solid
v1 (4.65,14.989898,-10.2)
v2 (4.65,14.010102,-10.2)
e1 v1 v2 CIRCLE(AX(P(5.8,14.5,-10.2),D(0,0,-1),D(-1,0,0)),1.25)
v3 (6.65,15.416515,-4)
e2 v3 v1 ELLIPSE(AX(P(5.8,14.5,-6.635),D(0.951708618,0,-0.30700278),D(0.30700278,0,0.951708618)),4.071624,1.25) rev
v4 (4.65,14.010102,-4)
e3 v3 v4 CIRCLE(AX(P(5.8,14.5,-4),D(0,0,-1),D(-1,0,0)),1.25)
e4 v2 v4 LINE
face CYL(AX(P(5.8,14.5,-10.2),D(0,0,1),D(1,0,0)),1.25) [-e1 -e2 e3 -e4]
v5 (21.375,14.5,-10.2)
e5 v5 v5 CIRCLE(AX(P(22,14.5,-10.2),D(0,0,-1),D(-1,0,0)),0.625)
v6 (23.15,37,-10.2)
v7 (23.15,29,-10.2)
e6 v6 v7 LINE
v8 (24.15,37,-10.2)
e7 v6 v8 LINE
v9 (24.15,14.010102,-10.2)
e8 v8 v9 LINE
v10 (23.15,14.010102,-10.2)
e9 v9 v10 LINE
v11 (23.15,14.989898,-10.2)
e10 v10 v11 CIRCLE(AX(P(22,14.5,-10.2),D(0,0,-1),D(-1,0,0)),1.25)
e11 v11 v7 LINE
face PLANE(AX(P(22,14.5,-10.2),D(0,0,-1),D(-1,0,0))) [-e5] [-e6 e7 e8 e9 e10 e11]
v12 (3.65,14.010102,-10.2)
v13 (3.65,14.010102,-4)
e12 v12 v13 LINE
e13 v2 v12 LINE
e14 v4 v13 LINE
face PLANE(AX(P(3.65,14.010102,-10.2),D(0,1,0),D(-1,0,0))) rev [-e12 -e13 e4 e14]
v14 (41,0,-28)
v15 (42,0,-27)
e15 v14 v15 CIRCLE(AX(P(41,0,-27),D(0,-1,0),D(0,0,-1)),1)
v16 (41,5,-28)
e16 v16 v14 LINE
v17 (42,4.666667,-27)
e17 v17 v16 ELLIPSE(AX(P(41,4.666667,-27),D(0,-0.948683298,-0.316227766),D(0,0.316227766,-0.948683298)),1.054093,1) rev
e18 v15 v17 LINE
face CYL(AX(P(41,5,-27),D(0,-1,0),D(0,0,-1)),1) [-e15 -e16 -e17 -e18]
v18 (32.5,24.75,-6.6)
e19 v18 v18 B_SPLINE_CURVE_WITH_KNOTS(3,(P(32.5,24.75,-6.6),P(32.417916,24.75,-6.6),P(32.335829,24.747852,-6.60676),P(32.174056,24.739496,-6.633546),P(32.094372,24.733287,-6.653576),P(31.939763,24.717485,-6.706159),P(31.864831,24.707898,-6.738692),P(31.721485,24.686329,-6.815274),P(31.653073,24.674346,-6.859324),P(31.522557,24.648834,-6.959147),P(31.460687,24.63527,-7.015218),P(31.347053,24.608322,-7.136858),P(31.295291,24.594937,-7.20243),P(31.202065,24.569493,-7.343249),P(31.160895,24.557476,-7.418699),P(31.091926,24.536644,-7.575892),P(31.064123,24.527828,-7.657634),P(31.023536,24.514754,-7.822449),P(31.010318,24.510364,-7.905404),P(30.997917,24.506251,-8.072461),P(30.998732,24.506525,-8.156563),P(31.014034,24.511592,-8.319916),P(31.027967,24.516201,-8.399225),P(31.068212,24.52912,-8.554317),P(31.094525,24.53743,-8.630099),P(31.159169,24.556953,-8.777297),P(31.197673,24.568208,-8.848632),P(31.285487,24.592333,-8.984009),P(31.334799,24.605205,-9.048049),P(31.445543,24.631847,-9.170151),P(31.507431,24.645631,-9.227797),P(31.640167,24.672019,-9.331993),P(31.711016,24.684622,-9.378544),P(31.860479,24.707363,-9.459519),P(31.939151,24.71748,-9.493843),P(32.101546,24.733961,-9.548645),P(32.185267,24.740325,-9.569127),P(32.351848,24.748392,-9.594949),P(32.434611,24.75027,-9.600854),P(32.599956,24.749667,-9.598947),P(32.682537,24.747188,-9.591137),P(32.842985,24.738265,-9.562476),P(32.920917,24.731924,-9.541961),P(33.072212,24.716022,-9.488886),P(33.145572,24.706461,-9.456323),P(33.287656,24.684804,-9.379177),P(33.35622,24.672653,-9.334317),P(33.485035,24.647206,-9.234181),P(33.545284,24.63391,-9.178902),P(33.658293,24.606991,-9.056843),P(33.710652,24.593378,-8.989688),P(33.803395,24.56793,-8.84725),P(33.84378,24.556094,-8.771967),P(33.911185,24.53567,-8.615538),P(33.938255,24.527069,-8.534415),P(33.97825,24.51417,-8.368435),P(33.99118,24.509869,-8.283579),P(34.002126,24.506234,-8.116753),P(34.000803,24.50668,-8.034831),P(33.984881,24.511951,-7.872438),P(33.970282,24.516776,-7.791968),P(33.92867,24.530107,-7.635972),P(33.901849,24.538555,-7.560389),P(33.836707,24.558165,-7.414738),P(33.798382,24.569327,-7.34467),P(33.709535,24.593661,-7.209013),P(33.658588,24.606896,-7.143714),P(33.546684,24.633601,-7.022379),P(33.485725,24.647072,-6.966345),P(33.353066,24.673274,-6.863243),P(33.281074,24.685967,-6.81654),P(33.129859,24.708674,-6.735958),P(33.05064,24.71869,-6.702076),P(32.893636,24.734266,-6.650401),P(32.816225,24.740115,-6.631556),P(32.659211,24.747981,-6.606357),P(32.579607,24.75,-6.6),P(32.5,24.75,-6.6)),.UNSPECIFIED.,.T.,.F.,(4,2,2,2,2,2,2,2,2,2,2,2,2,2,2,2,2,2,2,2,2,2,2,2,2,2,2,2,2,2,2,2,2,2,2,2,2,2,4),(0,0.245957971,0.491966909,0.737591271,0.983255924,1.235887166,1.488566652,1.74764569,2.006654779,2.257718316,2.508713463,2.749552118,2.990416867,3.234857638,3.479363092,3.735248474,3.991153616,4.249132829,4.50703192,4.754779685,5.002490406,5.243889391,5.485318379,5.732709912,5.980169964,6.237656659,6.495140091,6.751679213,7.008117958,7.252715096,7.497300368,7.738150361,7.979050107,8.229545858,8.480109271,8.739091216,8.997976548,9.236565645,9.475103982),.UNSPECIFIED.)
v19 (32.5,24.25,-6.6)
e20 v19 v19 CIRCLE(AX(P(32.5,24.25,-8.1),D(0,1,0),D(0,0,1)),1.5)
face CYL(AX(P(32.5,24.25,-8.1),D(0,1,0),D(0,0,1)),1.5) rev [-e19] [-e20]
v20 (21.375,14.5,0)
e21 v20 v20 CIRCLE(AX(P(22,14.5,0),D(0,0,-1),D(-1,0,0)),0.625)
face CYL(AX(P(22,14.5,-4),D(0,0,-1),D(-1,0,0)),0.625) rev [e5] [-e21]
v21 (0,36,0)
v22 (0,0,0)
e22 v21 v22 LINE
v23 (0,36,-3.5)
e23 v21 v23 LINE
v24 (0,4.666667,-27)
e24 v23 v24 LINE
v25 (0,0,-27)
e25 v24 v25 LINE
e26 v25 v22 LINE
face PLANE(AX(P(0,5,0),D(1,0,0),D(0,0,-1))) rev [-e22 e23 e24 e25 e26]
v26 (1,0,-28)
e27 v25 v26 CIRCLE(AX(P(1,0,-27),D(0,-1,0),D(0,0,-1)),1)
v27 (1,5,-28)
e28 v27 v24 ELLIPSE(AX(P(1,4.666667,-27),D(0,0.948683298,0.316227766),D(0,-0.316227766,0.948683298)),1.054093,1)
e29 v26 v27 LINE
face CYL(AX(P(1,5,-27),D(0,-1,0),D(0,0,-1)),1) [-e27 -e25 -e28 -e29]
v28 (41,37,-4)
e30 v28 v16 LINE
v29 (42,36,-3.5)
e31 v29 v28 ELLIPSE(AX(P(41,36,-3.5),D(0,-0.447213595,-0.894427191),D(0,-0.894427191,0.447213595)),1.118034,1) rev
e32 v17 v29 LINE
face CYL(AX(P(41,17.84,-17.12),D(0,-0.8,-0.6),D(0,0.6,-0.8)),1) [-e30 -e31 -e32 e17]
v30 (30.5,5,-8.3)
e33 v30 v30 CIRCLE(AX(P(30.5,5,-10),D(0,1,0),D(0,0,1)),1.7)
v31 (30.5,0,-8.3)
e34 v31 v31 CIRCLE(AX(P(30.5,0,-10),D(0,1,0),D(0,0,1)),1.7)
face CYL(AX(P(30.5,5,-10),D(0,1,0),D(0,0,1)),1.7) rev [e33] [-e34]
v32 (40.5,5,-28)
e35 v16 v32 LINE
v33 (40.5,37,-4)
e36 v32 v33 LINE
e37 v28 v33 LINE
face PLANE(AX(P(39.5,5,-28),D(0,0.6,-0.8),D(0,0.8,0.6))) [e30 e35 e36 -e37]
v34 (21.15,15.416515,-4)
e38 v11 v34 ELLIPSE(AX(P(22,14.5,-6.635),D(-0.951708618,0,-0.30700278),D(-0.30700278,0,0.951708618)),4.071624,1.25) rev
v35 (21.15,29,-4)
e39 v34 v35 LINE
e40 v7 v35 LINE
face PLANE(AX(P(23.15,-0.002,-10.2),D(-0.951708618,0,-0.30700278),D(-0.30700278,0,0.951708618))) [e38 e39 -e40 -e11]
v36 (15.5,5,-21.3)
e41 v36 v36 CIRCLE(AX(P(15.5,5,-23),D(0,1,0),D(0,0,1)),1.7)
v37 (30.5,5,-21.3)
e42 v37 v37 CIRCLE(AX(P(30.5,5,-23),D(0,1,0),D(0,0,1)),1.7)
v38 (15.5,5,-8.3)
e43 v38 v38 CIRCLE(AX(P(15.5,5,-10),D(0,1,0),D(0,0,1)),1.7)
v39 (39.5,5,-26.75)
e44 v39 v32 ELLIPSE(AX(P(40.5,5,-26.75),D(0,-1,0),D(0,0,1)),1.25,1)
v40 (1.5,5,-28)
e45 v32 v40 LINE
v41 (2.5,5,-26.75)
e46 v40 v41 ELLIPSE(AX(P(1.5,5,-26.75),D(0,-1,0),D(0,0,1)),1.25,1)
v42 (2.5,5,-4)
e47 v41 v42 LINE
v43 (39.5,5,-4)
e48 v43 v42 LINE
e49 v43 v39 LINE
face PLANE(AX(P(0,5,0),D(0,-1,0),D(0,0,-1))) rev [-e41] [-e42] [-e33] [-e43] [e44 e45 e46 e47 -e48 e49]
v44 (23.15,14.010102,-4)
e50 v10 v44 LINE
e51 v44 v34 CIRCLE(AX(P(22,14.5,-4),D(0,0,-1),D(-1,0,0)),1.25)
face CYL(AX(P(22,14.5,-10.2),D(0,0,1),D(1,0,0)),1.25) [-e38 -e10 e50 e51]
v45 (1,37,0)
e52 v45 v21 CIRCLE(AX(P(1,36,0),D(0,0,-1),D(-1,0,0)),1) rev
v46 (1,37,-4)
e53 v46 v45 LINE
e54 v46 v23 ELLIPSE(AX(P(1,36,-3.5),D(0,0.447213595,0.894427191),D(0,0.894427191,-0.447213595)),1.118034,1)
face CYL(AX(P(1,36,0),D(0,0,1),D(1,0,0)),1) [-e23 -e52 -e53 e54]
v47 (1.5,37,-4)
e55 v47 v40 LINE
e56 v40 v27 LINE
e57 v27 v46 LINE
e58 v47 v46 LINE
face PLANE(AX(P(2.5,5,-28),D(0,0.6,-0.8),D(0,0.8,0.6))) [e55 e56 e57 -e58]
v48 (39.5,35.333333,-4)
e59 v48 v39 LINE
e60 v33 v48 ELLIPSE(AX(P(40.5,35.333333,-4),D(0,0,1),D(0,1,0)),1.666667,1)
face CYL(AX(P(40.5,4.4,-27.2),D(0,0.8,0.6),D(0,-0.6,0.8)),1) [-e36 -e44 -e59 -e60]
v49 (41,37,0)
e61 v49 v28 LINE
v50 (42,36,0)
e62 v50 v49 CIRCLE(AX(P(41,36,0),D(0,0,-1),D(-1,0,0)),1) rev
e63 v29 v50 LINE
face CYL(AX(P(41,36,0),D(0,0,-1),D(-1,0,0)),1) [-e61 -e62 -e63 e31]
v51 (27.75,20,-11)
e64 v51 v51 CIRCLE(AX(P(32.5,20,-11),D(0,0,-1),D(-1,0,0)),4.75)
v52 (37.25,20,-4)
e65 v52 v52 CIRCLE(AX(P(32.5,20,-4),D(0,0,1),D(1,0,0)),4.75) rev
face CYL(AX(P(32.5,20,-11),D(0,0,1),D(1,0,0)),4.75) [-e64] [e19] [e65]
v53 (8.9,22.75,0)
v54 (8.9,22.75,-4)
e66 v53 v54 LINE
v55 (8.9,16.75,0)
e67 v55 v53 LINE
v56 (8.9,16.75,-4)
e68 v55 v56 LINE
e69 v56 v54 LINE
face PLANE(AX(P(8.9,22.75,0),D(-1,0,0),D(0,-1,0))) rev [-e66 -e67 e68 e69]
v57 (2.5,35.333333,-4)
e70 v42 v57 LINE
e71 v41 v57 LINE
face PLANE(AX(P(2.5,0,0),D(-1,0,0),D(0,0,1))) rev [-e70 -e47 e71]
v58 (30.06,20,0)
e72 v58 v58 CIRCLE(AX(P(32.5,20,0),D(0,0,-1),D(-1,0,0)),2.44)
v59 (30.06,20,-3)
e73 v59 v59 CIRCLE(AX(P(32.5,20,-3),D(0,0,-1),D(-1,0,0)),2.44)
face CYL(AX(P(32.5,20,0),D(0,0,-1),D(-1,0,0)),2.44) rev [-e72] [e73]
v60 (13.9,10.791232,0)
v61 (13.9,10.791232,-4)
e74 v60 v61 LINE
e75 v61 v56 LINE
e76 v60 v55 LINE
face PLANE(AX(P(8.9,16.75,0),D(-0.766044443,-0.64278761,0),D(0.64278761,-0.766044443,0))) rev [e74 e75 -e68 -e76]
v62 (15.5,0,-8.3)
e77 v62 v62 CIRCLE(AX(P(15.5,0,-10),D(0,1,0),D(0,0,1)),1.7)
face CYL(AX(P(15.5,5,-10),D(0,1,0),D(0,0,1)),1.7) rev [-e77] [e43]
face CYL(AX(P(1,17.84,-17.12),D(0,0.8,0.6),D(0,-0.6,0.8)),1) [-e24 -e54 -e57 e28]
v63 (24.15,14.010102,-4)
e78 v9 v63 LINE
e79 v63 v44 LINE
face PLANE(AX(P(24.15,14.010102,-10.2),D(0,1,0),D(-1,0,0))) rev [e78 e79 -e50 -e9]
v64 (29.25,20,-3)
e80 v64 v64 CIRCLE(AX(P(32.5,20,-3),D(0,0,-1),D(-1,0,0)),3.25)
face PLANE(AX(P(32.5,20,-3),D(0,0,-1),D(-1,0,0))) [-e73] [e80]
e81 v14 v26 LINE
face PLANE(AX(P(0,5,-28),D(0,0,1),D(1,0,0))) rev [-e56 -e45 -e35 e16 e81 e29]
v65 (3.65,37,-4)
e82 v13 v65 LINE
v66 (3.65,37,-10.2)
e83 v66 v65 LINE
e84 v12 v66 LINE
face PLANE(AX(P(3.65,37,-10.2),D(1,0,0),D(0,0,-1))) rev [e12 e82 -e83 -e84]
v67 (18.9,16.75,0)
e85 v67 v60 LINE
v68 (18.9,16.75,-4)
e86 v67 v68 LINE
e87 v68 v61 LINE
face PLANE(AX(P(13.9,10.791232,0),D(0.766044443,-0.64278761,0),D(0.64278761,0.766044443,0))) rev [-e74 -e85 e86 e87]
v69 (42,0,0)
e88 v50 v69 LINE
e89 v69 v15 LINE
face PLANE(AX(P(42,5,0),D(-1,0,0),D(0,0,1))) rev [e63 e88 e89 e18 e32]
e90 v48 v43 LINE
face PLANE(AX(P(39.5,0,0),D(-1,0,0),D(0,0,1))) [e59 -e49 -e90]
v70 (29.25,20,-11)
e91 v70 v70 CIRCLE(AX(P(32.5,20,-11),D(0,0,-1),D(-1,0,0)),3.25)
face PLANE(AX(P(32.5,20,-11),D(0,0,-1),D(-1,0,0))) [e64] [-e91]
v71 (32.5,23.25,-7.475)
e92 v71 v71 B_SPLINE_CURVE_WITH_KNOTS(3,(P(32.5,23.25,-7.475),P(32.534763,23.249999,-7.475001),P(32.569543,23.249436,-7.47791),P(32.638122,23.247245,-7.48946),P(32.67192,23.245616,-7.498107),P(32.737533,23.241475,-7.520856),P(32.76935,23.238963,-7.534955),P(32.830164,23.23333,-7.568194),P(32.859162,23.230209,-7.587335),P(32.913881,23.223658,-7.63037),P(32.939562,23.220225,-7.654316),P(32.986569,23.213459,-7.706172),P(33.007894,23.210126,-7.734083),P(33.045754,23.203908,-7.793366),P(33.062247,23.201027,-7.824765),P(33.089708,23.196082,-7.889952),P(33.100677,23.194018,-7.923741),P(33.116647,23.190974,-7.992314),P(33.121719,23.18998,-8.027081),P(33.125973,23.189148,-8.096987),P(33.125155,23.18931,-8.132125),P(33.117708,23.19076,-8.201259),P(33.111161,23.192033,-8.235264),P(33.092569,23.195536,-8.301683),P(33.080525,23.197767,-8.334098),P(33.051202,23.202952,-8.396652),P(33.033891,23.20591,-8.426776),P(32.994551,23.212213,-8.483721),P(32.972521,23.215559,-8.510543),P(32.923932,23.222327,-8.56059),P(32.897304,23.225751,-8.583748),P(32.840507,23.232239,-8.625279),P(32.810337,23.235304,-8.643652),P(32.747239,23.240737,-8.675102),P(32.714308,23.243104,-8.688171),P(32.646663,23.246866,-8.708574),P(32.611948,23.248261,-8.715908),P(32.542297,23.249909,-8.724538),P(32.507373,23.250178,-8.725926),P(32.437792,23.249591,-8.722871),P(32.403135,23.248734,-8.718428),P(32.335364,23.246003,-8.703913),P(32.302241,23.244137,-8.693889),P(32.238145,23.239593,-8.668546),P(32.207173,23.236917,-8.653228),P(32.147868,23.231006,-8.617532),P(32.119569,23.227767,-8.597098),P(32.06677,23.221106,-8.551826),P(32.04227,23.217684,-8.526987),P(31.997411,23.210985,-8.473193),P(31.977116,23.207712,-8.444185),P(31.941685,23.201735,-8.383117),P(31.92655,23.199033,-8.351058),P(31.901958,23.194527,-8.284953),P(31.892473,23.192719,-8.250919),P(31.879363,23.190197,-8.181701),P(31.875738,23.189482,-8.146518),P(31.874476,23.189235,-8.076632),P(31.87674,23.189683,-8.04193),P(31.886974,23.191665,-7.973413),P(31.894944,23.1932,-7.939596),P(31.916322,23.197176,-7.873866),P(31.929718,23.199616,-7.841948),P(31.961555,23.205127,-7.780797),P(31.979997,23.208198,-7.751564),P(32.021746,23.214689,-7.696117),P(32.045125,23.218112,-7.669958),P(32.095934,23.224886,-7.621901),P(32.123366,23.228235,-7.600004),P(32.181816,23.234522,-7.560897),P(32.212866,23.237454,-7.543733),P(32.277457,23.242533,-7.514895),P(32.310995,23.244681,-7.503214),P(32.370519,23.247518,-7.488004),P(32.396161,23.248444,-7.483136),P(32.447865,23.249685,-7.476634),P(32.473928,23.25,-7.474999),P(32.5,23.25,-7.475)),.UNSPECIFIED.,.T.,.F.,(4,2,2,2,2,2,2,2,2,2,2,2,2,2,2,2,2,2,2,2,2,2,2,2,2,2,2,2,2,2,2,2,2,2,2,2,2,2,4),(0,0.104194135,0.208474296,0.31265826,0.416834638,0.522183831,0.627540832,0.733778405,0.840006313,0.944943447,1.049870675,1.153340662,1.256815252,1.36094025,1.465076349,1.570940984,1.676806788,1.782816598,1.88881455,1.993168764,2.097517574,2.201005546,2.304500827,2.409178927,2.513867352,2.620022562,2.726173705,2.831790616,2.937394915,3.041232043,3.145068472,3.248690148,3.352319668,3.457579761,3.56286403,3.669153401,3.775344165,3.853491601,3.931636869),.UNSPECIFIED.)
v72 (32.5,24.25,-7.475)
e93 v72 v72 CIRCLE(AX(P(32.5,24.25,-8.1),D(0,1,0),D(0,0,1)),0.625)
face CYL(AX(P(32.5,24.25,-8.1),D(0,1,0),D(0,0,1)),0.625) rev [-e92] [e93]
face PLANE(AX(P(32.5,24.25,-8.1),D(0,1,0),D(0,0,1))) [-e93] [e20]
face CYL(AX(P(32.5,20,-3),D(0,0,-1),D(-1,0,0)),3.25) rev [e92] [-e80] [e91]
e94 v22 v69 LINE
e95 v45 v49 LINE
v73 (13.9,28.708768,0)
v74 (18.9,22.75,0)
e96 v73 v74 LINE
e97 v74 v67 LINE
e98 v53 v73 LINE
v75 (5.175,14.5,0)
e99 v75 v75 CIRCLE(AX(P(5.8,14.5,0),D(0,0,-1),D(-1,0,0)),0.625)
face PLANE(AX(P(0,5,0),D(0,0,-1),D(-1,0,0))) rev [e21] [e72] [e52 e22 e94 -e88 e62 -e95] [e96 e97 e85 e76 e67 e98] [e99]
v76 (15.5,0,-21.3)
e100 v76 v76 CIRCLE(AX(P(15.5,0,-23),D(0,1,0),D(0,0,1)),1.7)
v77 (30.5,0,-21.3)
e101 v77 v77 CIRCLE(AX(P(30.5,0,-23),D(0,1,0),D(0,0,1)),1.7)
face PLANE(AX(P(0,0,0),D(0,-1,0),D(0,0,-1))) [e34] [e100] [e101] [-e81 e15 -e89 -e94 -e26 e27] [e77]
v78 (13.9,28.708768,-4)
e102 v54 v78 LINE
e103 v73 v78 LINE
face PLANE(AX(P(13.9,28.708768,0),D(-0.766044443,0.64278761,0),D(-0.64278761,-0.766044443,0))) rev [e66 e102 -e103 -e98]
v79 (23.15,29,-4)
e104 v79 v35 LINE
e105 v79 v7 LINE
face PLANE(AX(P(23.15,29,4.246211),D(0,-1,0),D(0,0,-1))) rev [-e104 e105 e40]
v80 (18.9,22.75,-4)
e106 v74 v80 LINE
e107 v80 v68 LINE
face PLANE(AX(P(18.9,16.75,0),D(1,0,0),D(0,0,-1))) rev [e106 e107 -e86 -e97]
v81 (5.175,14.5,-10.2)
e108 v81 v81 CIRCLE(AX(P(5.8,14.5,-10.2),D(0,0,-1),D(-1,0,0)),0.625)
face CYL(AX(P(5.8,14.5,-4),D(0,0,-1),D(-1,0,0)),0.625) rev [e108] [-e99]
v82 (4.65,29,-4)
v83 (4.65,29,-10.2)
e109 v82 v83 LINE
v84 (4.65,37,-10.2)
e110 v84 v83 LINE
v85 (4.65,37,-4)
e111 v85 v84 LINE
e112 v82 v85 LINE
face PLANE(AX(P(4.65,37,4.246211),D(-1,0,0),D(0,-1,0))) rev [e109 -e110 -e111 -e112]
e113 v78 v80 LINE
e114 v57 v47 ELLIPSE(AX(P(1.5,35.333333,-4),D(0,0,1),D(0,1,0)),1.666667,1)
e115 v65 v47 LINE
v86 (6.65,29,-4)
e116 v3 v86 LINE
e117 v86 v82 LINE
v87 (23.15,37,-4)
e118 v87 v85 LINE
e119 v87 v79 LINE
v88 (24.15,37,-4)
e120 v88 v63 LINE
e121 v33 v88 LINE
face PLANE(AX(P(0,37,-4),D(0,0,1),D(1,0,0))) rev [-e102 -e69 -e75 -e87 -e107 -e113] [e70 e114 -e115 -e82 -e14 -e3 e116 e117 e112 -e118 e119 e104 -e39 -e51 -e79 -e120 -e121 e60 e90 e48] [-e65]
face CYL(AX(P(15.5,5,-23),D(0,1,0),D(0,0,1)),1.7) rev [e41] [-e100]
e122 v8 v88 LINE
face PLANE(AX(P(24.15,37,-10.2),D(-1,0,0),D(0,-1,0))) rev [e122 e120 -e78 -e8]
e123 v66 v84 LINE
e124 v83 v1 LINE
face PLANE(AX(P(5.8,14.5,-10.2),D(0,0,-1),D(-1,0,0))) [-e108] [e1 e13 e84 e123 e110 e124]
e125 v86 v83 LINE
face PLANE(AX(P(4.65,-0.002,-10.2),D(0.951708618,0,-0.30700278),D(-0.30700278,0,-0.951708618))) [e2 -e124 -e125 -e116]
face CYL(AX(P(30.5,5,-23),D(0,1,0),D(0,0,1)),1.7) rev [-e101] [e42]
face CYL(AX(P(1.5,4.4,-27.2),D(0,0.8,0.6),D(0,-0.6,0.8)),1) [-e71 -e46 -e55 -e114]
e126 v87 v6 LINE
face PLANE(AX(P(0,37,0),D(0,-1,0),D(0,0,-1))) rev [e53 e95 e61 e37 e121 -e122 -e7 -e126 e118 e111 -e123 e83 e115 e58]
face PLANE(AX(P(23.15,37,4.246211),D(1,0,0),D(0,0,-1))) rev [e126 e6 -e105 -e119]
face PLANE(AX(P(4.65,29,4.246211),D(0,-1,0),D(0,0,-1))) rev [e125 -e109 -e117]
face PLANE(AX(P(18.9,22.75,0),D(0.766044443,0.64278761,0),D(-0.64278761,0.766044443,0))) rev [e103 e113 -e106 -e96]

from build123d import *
from build123d.topology import SkipClean

# Parameters (mm, degrees)
SKETCH1_W                           = 42
SKETCH1_H                           = 28
BOSS_EXTRUDE1_DEPTH                 = 5
SKETCH2_W                           = 42
SKETCH2_H                           = 4
BOSS_EXTRUDE2_DEPTH                 = 32
TAP_DRILL_FOR_M1_6X0_35_TAP1_D      = 1.25
M3_CLEARANCE_HOLE1_D                = 3.4
BOSS_EXTRUDE3_DEPTH                 = 2.5
BOSS_EXTRUDE4_DEPTH                 = 2.5
FILLET2_R                           = 1
SKETCH9_R                           = 3.25
CUT_EXTRUDE1_DEPTH                  = 1
SKETCH10_R                          = 2.44
CUT_EXTRUDE2_DEPTH                  = 62.302528496
SKETCH11_R                          = 0.625
BOSS_EXTRUDE5_DEPTH                 = 6.2
CUT_EXTRUDE3_DEPTH                  = 61.901559914
BOSS_EXTRUDE6_REACH                 = 64.586
BOSS_EXTRUDE8_START                 = 7
SKETCH16_R                          = 4.75
SKETCH16_R_2                        = 3.25
BOSS_EXTRUDE8_DEPTH                 = 7
SKETCH17_R                          = 1.5
CUT_EXTRUDE4_DEPTH                  = 0.5
TAP_DRILL_FOR_M1_6X0_35_TAP2_REACH  = 58.001
TAP_DRILL_FOR_M1_6X0_35_TAP2_BORE_R = 0.625
SKETCH21_W                          = 2
SKETCH21_H                          = 8
CUT_EXTRUDE5_DEPTH                  = 6.2


with BuildPart() as part:
    # Sketch1 → Boss-Extrude1 (new body)
    with BuildSketch(Plane(origin=(0, 0, 0), x_dir=(1, 0, 0), z_dir=(0, 1, 0))):
        with Locations((21, 14)):
            Rectangle(SKETCH1_W, SKETCH1_H)
    extrude(amount=BOSS_EXTRUDE1_DEPTH)

    # Sketch2 → Boss-Extrude2 (add)
    with BuildSketch(Plane(origin=(0, 5, 0), x_dir=(1, 0, 0), z_dir=(0, 1, 0))):
        with Locations((21, 2)):
            Rectangle(SKETCH2_W, SKETCH2_H)
    extrude(amount=BOSS_EXTRUDE2_DEPTH)

    # Tap Drill for M1.6x0.35 Tap1 (through all)
    with Locations(Plane(origin=(0, 0, -4), x_dir=(-1, 0, 0), z_dir=(0, 0, -1))):
        with Locations((-22, 14.5), (-5.8, 14.5)):
            Hole(TAP_DRILL_FOR_M1_6X0_35_TAP1_D / 2)

    # M3 Clearance Hole1 (through all)
    with Locations(Plane(origin=(0, 5, 0), x_dir=(1, 0, 0), z_dir=(0, 1, 0))):
        with Locations((15.5, 23), (30.5, 23), (30.5, 10), (15.5, 10)):
            Hole(M3_CLEARANCE_HOLE1_D / 2)

    # Sketch7 → Boss-Extrude3 (add)
    with BuildSketch(Plane.ZY):
        Polygon((-28, 5), (-4, 37), (-4, 5), align=None)
    extrude(amount=-BOSS_EXTRUDE3_DEPTH)

    # Sketch8 → Boss-Extrude4 (add)
    with BuildSketch(Plane(origin=(42, 0, 0), x_dir=(0, 0, -1), z_dir=(1, 0, 0))):
        Polygon((28, 5), (4, 37), (4, 5), align=None)
    extrude(amount=-BOSS_EXTRUDE4_DEPTH)

    # Fillet2
    fillet2_edges = [part.edges().sort_by_distance(p)[0] for p in [
        (0, 37, -2),
        (42, 37, -2),
        (2.5, 21, -16),
        (0, 21, -16),
        (39.5, 21, -16),
        (42, 21, -16),
        (0, 2.5, -28),
        (42, 2.5, -28),
    ]]
    fillet(fillet2_edges, radius=FILLET2_R)

    # Sketch9 → Cut-Extrude1 (cut)
    with BuildSketch(Plane(origin=(0, 0, -4), x_dir=(-1, 0, 0), z_dir=(0, 0, -1))):
        with Locations((-32.5, 20)):
            Circle(SKETCH9_R)
    extrude(amount=-CUT_EXTRUDE1_DEPTH, mode=Mode.SUBTRACT)

    # Sketch10 → Cut-Extrude2 (cut, through all)
    with BuildSketch(Plane(origin=(0, 0, -3), x_dir=(-1, 0, 0), z_dir=(0, 0, -1))):
        with Locations((-32.5, 20)):
            Circle(SKETCH10_R)
    extrude(amount=-CUT_EXTRUDE2_DEPTH, mode=Mode.SUBTRACT)

    # Sketch11 → Boss-Extrude5 (add)
    # profile 1 of 2: a face of its own
    with SkipClean():  # the faces are left unmerged after this step: merging them gives an invalid solid
        with BuildSketch(Plane(origin=(0, 0, -4), x_dir=(-1, 0, 0), z_dir=(0, 0, -1))):
            with BuildLine():
                Line((-3.65, 37), (-4.65, 37))
                Line((-4.65, 37), (-4.65, 14.989897949))
                ThreePointArc((-4.65, 14.989897949), (-7.05, 14.5), (-4.65, 14.010102051))
                Line((-4.65, 14.010102051), (-3.65, 14.010102051))
                Line((-3.65, 14.010102051), (-3.65, 37))
            make_face()
            with Locations((-5.8, 14.5)):
                Circle(SKETCH11_R, mode=Mode.SUBTRACT)
        # profile 2 of 2: a face of its own
        with BuildSketch(Plane(origin=(0, 0, -4), x_dir=(-1, 0, 0), z_dir=(0, 0, -1))):
            with BuildLine():
                Line((-24.15, 37), (-23.15, 37))
                Line((-23.15, 37), (-23.15, 14.989897949))
                ThreePointArc((-23.15, 14.989897949), (-20.75, 14.5), (-23.15, 14.010102051))
                Line((-23.15, 14.010102051), (-24.15, 14.010102051))
                Line((-24.15, 14.010102051), (-24.15, 37))
            make_face()
            with Locations((-22, 14.5)):
                Circle(SKETCH11_R, mode=Mode.SUBTRACT)
        extrude(amount=BOSS_EXTRUDE5_DEPTH)
    add(part.part.scale(1), mode=Mode.REPLACE)  # the faces are merged on a copy

    # Sketch13 → Cut-Extrude3 (cut, through all)
    with BuildSketch(Plane(origin=(0, 0, -4), x_dir=(-1, 0, 0), z_dir=(0, 0, -1))):
        Polygon((-13.9, 28.708767963), (-8.9, 22.75), (-8.9, 16.75), (-13.9, 10.791232037), (-18.9, 16.75), (-18.9, 22.75), align=None)
    extrude(amount=-CUT_EXTRUDE3_DEPTH, mode=Mode.SUBTRACT)

    # Sketch14 → Boss-Extrude6 (add, up to next)
    with BuildSketch(Plane(origin=(0, 37, 0), x_dir=(1, 0, 0), z_dir=(0, 1, 0)), mode=Mode.PRIVATE) as boss_extrude6_sk1:
        Polygon((23.15, 10.2), (21.15, 4), (23.15, 4), align=None)
    boss_extrude6_tool1 = extrude(boss_extrude6_sk1.sketch, amount=-BOSS_EXTRUDE6_REACH, mode=Mode.PRIVATE) - part.part
    # Sketch14 → Boss-Extrude6 (add, up to next)
    with BuildSketch(Plane(origin=(0, 37, 0), x_dir=(1, 0, 0), z_dir=(0, 1, 0)), mode=Mode.PRIVATE) as boss_extrude6_sk2:
        Polygon((4.65, 10.2), (6.65, 4), (4.65, 4), align=None)
    boss_extrude6_tool2 = extrude(boss_extrude6_sk2.sketch, amount=-BOSS_EXTRUDE6_REACH, mode=Mode.PRIVATE) - part.part
    add(boss_extrude6_tool1.solids().sort_by_distance((22.483333, 37, -6.066667))[0])
    add(boss_extrude6_tool2.solids().sort_by_distance((5.316667, 37, -6.066667))[0])

    # Sketch16 → Boss-Extrude8 (add)
    with SkipClean():  # the faces are left unmerged after this step: merging them gives an invalid solid
        with BuildSketch(Plane(origin=(0, 0, -4), x_dir=(-1, 0, 0), z_dir=(0, 0, -1)).offset(BOSS_EXTRUDE8_START)):
            with Locations(Location((-32.5, 20, 0), (0, 0, 180))):
                Circle(SKETCH16_R)
            with Locations((-32.5, 20)):
                Circle(SKETCH16_R_2, mode=Mode.SUBTRACT)
        extrude(amount=-BOSS_EXTRUDE8_DEPTH)

    # Sketch17 → Cut-Extrude4 (cut)
    with SkipClean():  # the faces are left unmerged after this step: merging them gives an invalid solid
        with BuildSketch(Plane(origin=(0, 24.75, 0), x_dir=(1, 0, 0), z_dir=(0, 1, 0))):
            with Locations(Location((32.5, 8.1, 0), (0, 0, 270))):
                Circle(SKETCH17_R)
        extrude(amount=-CUT_EXTRUDE4_DEPTH, mode=Mode.SUBTRACT)

    # Tap Drill for M1.6x0.35 Tap2 bore → Tap Drill for M1.6x0.35 Tap2 (cut, up to next)
    with BuildSketch(Plane(origin=(0, 24.25, 0), x_dir=(1, 0, 0), z_dir=(0, 1, 0)), mode=Mode.PRIVATE) as tap_drill_for_m1_6x0_35_tap2_sk1:
        with Locations((32.5, 8.1)):
            Circle(TAP_DRILL_FOR_M1_6X0_35_TAP2_BORE_R)
    tap_drill_for_m1_6x0_35_tap2_tool1 = extrude(tap_drill_for_m1_6x0_35_tap2_sk1.sketch, amount=-TAP_DRILL_FOR_M1_6X0_35_TAP2_REACH, mode=Mode.PRIVATE) & part.part
    add(tap_drill_for_m1_6x0_35_tap2_tool1.solids().sort_by_distance((32.5, 24.25, -8.1))[0], mode=Mode.SUBTRACT)

    # Sketch21 → Cut-Extrude5 (cut)
    with BuildSketch(Plane(origin=(0, 0, -10.2), x_dir=(-1, 0, 0), z_dir=(0, 0, -1))):
        with Locations((-5.65, 33)):
            Rectangle(SKETCH21_W, SKETCH21_H)
        with Locations((-22.15, 33)):
            Rectangle(SKETCH21_W, SKETCH21_H)
    extrude(amount=-CUT_EXTRUDE5_DEPTH, mode=Mode.SUBTRACT)


solid = part.part
